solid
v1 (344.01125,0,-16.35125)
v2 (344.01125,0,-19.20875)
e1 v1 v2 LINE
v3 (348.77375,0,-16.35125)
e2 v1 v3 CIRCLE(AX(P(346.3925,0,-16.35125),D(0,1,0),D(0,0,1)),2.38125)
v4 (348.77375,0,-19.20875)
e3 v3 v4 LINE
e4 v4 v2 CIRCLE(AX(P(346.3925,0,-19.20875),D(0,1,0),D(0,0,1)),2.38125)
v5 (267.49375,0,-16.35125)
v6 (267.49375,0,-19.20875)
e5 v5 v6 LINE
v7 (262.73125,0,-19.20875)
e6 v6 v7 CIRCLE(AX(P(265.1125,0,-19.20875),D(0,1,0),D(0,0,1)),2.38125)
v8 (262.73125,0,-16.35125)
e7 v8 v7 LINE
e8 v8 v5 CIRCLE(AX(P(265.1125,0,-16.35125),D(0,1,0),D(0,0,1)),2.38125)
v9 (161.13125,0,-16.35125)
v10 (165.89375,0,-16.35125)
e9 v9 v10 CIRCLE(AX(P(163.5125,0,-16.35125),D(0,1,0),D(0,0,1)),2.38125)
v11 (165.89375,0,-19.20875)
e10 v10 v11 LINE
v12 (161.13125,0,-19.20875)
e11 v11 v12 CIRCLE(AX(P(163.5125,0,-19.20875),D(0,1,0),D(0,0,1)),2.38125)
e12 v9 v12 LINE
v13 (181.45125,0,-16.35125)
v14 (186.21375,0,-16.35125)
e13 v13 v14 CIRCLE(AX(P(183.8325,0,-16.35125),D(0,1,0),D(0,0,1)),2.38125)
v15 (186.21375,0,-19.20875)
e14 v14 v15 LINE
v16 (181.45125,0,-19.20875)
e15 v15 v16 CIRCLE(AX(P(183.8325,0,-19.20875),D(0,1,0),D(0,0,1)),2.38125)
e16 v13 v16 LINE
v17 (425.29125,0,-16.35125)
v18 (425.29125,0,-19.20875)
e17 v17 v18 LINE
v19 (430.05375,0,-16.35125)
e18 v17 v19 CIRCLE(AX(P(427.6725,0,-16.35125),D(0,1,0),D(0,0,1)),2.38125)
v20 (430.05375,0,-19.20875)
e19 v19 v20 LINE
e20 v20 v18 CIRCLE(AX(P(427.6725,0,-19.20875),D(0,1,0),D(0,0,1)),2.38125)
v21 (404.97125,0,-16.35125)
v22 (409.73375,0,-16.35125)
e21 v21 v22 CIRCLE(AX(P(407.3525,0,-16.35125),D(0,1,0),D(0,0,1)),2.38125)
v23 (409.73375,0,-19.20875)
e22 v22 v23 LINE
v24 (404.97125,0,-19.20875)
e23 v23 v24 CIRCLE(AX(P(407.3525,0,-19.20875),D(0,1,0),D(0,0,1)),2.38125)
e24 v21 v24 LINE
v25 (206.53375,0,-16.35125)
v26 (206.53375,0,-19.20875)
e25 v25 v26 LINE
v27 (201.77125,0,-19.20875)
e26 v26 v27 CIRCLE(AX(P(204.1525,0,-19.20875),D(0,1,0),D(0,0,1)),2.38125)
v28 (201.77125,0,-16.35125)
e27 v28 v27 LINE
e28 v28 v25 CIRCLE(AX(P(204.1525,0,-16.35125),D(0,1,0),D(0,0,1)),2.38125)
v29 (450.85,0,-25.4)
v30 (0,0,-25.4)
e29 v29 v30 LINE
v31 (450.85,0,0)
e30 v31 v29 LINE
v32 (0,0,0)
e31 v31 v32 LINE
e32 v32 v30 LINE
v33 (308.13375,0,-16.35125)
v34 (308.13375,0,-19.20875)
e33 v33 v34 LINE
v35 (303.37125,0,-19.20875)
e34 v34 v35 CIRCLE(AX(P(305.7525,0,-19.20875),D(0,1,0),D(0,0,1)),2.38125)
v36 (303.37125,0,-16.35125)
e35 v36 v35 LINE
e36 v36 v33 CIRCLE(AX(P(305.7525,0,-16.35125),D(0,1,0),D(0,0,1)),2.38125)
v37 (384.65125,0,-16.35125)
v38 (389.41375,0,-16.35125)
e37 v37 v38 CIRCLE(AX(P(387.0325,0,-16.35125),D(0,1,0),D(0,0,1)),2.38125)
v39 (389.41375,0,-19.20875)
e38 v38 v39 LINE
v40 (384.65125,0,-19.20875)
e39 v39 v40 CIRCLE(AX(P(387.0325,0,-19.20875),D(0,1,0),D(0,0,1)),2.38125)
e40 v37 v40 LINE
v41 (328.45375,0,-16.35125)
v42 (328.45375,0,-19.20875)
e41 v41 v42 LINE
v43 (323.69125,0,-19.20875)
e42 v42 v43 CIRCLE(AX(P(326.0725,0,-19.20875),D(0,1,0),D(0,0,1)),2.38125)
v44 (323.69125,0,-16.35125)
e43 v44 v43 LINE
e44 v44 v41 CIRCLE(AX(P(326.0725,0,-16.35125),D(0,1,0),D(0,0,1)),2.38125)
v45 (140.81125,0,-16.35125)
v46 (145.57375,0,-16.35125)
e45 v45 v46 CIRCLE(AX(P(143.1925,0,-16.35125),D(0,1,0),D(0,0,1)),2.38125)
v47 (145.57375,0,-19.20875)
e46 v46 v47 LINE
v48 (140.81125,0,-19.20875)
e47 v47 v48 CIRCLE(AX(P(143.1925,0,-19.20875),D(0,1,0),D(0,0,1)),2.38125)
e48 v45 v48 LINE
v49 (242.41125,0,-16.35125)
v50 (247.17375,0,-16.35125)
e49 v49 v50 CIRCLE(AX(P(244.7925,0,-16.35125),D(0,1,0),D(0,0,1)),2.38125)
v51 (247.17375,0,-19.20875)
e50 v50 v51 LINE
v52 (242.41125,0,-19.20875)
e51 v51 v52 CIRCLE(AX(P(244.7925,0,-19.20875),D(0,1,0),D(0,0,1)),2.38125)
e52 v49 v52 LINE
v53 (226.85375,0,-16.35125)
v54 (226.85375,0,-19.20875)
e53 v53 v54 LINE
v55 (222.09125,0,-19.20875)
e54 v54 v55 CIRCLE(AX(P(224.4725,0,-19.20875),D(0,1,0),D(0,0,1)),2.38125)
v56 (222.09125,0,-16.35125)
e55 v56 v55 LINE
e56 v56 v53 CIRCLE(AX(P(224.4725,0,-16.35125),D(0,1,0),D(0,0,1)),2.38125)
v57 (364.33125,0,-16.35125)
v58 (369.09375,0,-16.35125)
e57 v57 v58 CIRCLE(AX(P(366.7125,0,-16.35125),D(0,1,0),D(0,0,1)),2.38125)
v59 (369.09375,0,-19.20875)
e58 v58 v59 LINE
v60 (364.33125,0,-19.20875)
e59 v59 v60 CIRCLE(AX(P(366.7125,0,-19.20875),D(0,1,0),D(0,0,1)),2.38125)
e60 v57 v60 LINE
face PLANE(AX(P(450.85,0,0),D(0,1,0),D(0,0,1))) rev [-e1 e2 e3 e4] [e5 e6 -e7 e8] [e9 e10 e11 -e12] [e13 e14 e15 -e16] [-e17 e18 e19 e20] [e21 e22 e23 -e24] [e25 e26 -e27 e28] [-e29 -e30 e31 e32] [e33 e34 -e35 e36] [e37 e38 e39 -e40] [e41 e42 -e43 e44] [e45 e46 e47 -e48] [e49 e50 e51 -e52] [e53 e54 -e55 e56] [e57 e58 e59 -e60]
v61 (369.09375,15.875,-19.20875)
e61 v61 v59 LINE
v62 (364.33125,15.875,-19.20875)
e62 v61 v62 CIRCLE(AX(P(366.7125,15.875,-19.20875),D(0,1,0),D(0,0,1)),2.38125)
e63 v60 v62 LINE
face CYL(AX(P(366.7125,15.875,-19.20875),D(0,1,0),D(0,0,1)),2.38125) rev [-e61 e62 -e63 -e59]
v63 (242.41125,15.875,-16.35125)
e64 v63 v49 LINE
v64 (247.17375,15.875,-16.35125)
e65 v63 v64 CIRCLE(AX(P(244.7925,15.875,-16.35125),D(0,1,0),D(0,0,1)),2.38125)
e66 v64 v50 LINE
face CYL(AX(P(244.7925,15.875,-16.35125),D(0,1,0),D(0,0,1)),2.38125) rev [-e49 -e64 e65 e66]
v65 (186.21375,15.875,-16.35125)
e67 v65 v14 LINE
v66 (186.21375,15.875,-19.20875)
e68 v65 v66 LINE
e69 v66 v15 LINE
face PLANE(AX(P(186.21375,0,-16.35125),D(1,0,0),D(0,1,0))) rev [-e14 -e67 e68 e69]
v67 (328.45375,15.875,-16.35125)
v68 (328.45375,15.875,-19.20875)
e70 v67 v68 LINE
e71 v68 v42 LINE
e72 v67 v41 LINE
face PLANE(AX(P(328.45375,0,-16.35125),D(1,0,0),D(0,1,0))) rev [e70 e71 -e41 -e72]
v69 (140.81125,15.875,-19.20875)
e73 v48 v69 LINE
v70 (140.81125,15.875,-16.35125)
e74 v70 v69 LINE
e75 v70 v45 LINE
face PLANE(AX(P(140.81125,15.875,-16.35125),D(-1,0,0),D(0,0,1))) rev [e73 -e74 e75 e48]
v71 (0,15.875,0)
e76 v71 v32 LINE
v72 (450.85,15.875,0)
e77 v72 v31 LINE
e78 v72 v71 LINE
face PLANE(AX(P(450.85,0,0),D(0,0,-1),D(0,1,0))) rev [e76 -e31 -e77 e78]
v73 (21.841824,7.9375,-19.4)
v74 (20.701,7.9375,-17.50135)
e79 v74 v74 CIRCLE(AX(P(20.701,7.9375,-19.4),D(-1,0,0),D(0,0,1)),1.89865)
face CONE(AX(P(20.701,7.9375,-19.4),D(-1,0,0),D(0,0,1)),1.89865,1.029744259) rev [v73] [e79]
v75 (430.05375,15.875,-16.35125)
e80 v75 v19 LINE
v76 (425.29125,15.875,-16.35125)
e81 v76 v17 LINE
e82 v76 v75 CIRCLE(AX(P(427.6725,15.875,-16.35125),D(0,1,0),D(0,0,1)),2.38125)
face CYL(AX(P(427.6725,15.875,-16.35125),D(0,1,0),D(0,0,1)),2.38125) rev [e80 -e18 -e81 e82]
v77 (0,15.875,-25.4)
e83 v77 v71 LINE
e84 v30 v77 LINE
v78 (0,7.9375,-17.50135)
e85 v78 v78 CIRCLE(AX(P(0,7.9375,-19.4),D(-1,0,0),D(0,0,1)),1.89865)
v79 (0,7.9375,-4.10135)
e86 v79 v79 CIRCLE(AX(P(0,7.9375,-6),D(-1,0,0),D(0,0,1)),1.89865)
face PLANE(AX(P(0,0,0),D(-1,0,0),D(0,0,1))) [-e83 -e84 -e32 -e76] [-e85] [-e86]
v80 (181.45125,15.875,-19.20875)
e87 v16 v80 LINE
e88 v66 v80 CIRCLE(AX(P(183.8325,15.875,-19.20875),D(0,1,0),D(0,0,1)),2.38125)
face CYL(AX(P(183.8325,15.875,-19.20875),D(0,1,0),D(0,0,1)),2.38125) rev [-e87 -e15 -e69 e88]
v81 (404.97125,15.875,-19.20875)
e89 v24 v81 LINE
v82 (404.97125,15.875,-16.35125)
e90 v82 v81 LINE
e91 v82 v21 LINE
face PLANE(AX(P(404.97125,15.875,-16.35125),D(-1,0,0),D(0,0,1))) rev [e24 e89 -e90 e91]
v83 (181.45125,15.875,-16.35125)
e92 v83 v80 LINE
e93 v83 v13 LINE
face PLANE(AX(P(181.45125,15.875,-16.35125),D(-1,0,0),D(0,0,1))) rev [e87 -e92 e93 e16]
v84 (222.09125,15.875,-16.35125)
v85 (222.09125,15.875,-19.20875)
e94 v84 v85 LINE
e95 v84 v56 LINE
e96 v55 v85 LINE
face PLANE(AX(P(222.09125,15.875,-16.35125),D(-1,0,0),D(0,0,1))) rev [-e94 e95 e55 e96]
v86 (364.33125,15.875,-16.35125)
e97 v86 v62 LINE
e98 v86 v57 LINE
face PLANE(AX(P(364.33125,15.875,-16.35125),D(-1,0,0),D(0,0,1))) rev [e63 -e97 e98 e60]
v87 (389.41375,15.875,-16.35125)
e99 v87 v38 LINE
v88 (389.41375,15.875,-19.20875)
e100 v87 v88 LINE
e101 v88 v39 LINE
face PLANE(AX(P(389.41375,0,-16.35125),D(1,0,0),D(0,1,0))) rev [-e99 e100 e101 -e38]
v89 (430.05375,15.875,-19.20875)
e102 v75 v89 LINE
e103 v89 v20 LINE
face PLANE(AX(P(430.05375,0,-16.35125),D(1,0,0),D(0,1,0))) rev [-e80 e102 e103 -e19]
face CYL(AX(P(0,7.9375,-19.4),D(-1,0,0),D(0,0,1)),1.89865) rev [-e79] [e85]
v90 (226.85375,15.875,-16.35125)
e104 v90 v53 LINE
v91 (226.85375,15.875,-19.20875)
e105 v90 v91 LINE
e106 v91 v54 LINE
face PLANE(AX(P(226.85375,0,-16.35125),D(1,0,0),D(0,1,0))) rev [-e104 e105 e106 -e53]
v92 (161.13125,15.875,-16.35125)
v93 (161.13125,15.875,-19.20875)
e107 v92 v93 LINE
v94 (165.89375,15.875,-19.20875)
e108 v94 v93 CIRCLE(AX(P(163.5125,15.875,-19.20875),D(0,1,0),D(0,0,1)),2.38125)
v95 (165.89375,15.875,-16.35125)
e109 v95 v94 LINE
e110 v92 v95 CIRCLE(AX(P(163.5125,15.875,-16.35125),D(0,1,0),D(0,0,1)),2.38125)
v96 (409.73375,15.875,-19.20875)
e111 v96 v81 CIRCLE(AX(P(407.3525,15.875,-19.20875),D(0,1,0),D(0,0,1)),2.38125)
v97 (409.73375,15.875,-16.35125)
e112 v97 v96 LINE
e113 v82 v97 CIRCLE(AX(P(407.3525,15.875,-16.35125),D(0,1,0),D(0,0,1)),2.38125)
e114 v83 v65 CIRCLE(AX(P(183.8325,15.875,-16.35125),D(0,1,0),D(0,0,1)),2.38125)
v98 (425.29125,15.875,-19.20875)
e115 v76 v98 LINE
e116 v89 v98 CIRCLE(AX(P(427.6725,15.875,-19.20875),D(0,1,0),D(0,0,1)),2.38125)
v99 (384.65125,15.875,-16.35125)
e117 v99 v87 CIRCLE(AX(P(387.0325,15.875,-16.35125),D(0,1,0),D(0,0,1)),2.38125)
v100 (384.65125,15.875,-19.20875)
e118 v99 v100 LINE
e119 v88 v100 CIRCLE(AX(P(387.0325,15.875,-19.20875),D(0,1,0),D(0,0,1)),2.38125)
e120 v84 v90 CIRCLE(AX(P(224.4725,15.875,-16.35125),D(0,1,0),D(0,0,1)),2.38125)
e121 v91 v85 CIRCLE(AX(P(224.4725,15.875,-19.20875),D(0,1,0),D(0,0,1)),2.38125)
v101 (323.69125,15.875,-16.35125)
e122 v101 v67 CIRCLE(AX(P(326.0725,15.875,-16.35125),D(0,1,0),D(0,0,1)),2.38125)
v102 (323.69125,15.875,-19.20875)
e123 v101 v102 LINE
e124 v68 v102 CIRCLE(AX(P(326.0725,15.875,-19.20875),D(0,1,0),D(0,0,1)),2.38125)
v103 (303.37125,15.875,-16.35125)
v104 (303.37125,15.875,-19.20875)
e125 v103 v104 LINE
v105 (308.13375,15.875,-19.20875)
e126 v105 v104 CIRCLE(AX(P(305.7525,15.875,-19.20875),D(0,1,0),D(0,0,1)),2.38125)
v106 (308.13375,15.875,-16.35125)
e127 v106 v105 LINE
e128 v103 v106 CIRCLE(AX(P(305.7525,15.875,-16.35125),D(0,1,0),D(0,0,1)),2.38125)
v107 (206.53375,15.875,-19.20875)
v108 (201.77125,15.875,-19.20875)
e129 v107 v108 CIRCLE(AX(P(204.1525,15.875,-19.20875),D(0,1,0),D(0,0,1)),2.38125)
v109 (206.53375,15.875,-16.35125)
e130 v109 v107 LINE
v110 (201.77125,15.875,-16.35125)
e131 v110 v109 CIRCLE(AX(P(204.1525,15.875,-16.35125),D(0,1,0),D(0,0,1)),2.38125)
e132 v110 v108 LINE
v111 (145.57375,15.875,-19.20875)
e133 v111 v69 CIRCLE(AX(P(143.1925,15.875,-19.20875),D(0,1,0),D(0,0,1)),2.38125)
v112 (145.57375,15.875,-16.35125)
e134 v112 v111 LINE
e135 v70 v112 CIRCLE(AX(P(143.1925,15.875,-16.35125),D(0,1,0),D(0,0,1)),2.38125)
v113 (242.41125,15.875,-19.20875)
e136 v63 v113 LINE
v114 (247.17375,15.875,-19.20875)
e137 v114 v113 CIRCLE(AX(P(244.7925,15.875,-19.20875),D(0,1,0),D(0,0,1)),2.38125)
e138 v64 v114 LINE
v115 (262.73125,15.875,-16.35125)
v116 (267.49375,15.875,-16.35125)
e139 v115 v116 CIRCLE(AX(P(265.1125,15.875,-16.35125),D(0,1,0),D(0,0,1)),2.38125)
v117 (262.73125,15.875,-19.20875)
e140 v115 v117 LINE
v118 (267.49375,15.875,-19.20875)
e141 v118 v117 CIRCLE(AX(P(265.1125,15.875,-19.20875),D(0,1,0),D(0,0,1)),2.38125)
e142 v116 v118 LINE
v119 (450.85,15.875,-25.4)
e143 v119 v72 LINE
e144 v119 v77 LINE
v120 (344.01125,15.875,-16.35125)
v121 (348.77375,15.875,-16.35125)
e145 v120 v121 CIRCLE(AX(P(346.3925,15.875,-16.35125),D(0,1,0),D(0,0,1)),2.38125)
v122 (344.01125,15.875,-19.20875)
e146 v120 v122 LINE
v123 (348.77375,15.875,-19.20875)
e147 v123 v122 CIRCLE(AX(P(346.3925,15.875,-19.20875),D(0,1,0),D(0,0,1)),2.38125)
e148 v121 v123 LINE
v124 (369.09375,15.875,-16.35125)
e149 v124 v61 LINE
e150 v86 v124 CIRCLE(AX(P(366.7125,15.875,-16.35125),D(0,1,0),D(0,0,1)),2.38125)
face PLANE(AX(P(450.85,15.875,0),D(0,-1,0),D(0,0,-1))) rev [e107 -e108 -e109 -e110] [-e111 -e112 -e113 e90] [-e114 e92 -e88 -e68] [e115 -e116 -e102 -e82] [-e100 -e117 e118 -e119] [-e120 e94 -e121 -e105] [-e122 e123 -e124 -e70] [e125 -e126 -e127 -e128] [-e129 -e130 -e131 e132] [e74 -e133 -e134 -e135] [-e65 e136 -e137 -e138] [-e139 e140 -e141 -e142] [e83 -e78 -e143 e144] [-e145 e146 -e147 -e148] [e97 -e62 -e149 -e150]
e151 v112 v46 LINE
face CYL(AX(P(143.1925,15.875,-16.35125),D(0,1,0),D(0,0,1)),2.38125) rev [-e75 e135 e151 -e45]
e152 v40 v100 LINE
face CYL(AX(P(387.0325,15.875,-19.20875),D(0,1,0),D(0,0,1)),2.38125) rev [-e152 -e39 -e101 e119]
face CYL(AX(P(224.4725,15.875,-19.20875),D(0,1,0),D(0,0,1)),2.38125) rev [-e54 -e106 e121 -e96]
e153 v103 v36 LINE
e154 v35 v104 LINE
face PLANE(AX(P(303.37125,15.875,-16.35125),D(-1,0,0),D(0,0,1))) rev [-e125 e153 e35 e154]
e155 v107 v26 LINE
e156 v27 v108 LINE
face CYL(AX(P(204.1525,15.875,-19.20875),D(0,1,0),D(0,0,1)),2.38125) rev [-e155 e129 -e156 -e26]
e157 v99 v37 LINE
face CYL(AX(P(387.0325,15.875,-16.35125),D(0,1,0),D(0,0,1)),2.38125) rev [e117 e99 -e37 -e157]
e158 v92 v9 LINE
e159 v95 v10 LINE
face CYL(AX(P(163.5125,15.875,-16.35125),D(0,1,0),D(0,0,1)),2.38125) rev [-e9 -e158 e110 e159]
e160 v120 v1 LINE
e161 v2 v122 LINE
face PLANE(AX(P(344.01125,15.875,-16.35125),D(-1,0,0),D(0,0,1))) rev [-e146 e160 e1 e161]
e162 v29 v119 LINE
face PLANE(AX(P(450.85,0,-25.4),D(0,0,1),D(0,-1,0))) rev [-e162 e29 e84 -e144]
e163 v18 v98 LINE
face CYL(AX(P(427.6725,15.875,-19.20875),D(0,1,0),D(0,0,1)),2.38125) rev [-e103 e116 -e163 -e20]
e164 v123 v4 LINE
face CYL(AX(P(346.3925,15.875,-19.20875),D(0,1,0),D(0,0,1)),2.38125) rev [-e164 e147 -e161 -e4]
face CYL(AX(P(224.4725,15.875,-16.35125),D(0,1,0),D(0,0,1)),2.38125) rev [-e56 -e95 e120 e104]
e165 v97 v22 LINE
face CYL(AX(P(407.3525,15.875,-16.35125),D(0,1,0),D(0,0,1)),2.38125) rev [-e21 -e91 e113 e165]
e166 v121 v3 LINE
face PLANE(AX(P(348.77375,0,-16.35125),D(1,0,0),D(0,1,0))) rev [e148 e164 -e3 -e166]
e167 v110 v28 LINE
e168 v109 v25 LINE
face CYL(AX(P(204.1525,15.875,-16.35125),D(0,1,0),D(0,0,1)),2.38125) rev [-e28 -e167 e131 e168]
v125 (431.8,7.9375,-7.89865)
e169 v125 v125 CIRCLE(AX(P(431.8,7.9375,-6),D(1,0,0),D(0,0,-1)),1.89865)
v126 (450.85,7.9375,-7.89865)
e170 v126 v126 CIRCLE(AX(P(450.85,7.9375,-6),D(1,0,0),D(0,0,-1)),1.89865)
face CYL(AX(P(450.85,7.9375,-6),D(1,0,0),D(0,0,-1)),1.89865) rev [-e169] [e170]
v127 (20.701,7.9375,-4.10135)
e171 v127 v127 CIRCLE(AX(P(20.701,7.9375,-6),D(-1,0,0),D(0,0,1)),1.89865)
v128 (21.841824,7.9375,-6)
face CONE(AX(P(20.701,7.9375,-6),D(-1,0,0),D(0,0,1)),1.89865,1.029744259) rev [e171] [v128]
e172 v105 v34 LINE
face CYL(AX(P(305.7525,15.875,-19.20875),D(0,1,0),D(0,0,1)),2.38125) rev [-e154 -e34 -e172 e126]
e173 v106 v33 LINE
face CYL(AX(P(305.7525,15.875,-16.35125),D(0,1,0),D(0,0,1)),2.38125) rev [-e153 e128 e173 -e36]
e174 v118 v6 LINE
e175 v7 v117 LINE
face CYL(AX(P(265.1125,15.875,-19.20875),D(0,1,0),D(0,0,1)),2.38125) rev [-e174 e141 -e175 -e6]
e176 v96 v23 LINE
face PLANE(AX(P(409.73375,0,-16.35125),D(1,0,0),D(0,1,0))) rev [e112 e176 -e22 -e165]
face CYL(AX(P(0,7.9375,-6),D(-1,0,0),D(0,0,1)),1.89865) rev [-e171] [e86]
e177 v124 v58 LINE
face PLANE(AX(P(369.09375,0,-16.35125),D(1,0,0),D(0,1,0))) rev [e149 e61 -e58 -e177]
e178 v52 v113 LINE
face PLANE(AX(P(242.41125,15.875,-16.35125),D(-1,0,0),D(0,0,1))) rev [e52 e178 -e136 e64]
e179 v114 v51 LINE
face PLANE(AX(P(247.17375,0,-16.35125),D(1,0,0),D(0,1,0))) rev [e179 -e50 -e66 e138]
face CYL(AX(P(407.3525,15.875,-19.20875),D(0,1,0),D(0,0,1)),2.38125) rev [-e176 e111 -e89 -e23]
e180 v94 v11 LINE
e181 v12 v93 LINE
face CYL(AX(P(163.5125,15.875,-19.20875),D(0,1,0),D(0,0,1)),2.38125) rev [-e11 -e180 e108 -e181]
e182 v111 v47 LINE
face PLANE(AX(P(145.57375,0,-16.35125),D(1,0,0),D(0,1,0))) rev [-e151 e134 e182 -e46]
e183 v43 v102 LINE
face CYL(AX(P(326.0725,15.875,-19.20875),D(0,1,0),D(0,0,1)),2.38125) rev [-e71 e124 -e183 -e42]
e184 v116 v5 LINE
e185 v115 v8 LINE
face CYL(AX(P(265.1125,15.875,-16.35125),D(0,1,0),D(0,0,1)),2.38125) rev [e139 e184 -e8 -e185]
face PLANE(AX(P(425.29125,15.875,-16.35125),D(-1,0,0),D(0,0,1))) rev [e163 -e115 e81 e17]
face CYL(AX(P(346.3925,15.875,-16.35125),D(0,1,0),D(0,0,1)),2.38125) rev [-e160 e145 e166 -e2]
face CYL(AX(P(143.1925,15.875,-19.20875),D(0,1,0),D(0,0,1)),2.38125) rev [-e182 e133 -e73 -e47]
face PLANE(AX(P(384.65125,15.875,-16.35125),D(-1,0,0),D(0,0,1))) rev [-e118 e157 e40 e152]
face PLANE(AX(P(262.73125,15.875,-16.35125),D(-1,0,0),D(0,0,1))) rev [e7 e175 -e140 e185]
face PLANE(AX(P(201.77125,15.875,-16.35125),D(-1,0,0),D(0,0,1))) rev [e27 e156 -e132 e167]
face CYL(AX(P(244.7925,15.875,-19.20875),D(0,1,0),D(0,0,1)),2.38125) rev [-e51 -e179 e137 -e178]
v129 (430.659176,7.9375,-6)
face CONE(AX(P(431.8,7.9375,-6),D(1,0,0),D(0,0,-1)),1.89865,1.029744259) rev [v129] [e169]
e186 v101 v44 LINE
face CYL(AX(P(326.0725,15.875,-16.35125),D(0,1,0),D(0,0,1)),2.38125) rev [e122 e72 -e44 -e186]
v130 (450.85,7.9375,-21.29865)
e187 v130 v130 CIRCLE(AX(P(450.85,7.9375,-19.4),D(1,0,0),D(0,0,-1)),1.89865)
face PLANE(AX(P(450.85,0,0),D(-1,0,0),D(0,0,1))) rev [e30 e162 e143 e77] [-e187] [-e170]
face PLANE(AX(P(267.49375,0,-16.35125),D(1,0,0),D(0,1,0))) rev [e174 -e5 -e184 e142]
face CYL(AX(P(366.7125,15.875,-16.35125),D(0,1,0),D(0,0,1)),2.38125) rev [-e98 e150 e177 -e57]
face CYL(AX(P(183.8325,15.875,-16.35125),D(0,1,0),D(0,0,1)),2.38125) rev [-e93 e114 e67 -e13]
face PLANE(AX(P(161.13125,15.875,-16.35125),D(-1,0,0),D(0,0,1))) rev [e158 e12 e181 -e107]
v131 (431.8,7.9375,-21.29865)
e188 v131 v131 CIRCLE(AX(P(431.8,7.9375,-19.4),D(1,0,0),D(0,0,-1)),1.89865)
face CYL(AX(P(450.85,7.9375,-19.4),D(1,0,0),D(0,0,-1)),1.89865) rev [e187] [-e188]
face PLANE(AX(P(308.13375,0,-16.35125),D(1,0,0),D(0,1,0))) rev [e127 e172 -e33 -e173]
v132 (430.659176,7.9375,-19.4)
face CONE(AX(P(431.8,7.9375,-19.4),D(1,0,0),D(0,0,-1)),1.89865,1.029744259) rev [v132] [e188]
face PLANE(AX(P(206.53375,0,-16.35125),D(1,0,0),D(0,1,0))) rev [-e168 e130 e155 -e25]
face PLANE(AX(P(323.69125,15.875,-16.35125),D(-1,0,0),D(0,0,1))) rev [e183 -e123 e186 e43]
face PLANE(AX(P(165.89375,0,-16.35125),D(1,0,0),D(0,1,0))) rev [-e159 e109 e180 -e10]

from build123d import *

# Parameters (mm, degrees)
SKETCH1_W                      = 25.4
SKETCH1_H                      = 15.875
BOSS_EXTRUDE1_DEPTH            = 450.85
TAP_DRILL_FOR_10_24_TAP1_D     = 3.7973
TAP_DRILL_FOR_10_24_TAP1_DEPTH = 20.701
TAP_DRILL_FOR_10_24_TAP1_TIP   = 1.140824014
TAP_DRILL_FOR_10_24_TAP2_D     = 3.7973
TAP_DRILL_FOR_10_24_TAP2_DEPTH = 19.05
TAP_DRILL_FOR_10_24_TAP2_TIP   = 1.140824014
F_10_CLEARANCE_SLOT2_DEPTH     = 15.875


# Read off the part's stored shape, not the designer's step: #10 Clearance Slot2
with BuildPart() as part:
    # Sketch1 → Boss-Extrude1 (new body)
    with BuildSketch(Plane(origin=(0, 0, 0), x_dir=(0, 0, -1), z_dir=(1, 0, 0))):
        with Locations((12.7, 7.9375)):
            Rectangle(SKETCH1_W, SKETCH1_H)
    extrude(amount=BOSS_EXTRUDE1_DEPTH)

    # Tap Drill for #10-24 Tap1
    with Locations(Plane.ZY):
        with Locations((-6, 7.9375), (-19.4, 7.9375)):
            Hole(TAP_DRILL_FOR_10_24_TAP1_D / 2, depth=TAP_DRILL_FOR_10_24_TAP1_DEPTH)
            with Locations((0, 0, -(TAP_DRILL_FOR_10_24_TAP1_DEPTH + TAP_DRILL_FOR_10_24_TAP1_TIP / 2))):  # 118° drill point
                Cone(0, TAP_DRILL_FOR_10_24_TAP1_D / 2, TAP_DRILL_FOR_10_24_TAP1_TIP, mode=Mode.SUBTRACT)

    # Tap Drill for #10-24 Tap2
    with Locations(Plane(origin=(450.85, 0, 0), x_dir=(0, 0, -1), z_dir=(1, 0, 0))):
        with Locations((6, 7.9375), (19.4, 7.9375)):
            Hole(TAP_DRILL_FOR_10_24_TAP2_D / 2, depth=TAP_DRILL_FOR_10_24_TAP2_DEPTH)
            with Locations((0, 0, -(TAP_DRILL_FOR_10_24_TAP2_DEPTH + TAP_DRILL_FOR_10_24_TAP2_TIP / 2))):  # 118° drill point
                Cone(0, TAP_DRILL_FOR_10_24_TAP2_D / 2, TAP_DRILL_FOR_10_24_TAP2_TIP, mode=Mode.SUBTRACT)

    # #10 Clearance Slot2 outline → #10 Clearance Slot2 (cut)
    with BuildSketch(Plane(origin=(0, 0, 0), x_dir=(1, 0, 0), z_dir=(0, 1, 0))):
        with BuildLine():
            Line((145.57375, 16.35125), (145.57375, 19.20875))
            ThreePointArc((145.57375, 19.20875), (143.1925, 21.59), (140.81125, 19.20875))
            Line((140.81125, 19.20875), (140.81125, 16.35125))
            ThreePointArc((140.81125, 16.35125), (143.1925, 13.97), (145.57375, 16.35125))
        make_face()
        with BuildLine():
            Line((165.89375, 16.35125), (165.89375, 19.20875))
            ThreePointArc((165.89375, 19.20875), (163.5125, 21.59), (161.13125, 19.20875))
            Line((161.13125, 19.20875), (161.13125, 16.35125))
            ThreePointArc((161.13125, 16.35125), (163.5125, 13.97), (165.89375, 16.35125))
        make_face()
        with BuildLine():
            Line((186.21375, 16.35125), (186.21375, 19.20875))
            ThreePointArc((186.21375, 19.20875), (183.8325, 21.59), (181.45125, 19.20875))
            Line((181.45125, 19.20875), (181.45125, 16.35125))
            ThreePointArc((181.45125, 16.35125), (183.8325, 13.97), (186.21375, 16.35125))
        make_face()
        with BuildLine():
            Line((206.53375, 16.35125), (206.53375, 19.20875))
            ThreePointArc((206.53375, 19.20875), (204.1525, 21.59), (201.77125, 19.20875))
            Line((201.77125, 19.20875), (201.77125, 16.35125))
            ThreePointArc((201.77125, 16.35125), (204.1525, 13.97), (206.53375, 16.35125))
        make_face()
        with BuildLine():
            Line((226.85375, 16.35125), (226.85375, 19.20875))
            ThreePointArc((226.85375, 19.20875), (224.4725, 21.59), (222.09125, 19.20875))
            Line((222.09125, 19.20875), (222.09125, 16.35125))
            ThreePointArc((222.09125, 16.35125), (224.4725, 13.97), (226.85375, 16.35125))
        make_face()
        with BuildLine():
            Line((247.17375, 16.35125), (247.17375, 19.20875))
            ThreePointArc((247.17375, 19.20875), (244.7925, 21.59), (242.41125, 19.20875))
            Line((242.41125, 19.20875), (242.41125, 16.35125))
            ThreePointArc((242.41125, 16.35125), (244.7925, 13.97), (247.17375, 16.35125))
        make_face()
        with BuildLine():
            Line((267.49375, 16.35125), (267.49375, 19.20875))
            ThreePointArc((267.49375, 19.20875), (265.1125, 21.59), (262.73125, 19.20875))
            Line((262.73125, 19.20875), (262.73125, 16.35125))
            ThreePointArc((262.73125, 16.35125), (265.1125, 13.97), (267.49375, 16.35125))
        make_face()
        with BuildLine():
            Line((308.13375, 16.35125), (308.13375, 19.20875))
            ThreePointArc((308.13375, 19.20875), (305.7525, 21.59), (303.37125, 19.20875))
            Line((303.37125, 19.20875), (303.37125, 16.35125))
            ThreePointArc((303.37125, 16.35125), (305.7525, 13.97), (308.13375, 16.35125))
        make_face()
        with BuildLine():
            Line((328.45375, 16.35125), (328.45375, 19.20875))
            ThreePointArc((328.45375, 19.20875), (326.0725, 21.59), (323.69125, 19.20875))
            Line((323.69125, 19.20875), (323.69125, 16.35125))
            ThreePointArc((323.69125, 16.35125), (326.0725, 13.97), (328.45375, 16.35125))
        make_face()
        with BuildLine():
            Line((348.77375, 16.35125), (348.77375, 19.20875))
            ThreePointArc((348.77375, 19.20875), (346.3925, 21.59), (344.01125, 19.20875))
            Line((344.01125, 19.20875), (344.01125, 16.35125))
            ThreePointArc((344.01125, 16.35125), (346.3925, 13.97), (348.77375, 16.35125))
        make_face()
        with BuildLine():
            Line((369.09375, 16.35125), (369.09375, 19.20875))
            ThreePointArc((369.09375, 19.20875), (366.7125, 21.59), (364.33125, 19.20875))
            Line((364.33125, 19.20875), (364.33125, 16.35125))
            ThreePointArc((364.33125, 16.35125), (366.7125, 13.97), (369.09375, 16.35125))
        make_face()
        with BuildLine():
            Line((389.41375, 16.35125), (389.41375, 19.20875))
            ThreePointArc((389.41375, 19.20875), (387.0325, 21.59), (384.65125, 19.20875))
            Line((384.65125, 19.20875), (384.65125, 16.35125))
            ThreePointArc((384.65125, 16.35125), (387.0325, 13.97), (389.41375, 16.35125))
        make_face()
        with BuildLine():
            Line((409.73375, 16.35125), (409.73375, 19.20875))
            ThreePointArc((409.73375, 19.20875), (407.3525, 21.59), (404.97125, 19.20875))
            Line((404.97125, 19.20875), (404.97125, 16.35125))
            ThreePointArc((404.97125, 16.35125), (407.3525, 13.97), (409.73375, 16.35125))
        make_face()
        with BuildLine():
            Line((430.05375, 16.35125), (430.05375, 19.20875))
            ThreePointArc((430.05375, 19.20875), (427.6725, 21.59), (425.29125, 19.20875))
            Line((425.29125, 19.20875), (425.29125, 16.35125))
            ThreePointArc((425.29125, 16.35125), (427.6725, 13.97), (430.05375, 16.35125))
        make_face()
    extrude(amount=F_10_CLEARANCE_SLOT2_DEPTH, mode=Mode.SUBTRACT)


solid = part.part
